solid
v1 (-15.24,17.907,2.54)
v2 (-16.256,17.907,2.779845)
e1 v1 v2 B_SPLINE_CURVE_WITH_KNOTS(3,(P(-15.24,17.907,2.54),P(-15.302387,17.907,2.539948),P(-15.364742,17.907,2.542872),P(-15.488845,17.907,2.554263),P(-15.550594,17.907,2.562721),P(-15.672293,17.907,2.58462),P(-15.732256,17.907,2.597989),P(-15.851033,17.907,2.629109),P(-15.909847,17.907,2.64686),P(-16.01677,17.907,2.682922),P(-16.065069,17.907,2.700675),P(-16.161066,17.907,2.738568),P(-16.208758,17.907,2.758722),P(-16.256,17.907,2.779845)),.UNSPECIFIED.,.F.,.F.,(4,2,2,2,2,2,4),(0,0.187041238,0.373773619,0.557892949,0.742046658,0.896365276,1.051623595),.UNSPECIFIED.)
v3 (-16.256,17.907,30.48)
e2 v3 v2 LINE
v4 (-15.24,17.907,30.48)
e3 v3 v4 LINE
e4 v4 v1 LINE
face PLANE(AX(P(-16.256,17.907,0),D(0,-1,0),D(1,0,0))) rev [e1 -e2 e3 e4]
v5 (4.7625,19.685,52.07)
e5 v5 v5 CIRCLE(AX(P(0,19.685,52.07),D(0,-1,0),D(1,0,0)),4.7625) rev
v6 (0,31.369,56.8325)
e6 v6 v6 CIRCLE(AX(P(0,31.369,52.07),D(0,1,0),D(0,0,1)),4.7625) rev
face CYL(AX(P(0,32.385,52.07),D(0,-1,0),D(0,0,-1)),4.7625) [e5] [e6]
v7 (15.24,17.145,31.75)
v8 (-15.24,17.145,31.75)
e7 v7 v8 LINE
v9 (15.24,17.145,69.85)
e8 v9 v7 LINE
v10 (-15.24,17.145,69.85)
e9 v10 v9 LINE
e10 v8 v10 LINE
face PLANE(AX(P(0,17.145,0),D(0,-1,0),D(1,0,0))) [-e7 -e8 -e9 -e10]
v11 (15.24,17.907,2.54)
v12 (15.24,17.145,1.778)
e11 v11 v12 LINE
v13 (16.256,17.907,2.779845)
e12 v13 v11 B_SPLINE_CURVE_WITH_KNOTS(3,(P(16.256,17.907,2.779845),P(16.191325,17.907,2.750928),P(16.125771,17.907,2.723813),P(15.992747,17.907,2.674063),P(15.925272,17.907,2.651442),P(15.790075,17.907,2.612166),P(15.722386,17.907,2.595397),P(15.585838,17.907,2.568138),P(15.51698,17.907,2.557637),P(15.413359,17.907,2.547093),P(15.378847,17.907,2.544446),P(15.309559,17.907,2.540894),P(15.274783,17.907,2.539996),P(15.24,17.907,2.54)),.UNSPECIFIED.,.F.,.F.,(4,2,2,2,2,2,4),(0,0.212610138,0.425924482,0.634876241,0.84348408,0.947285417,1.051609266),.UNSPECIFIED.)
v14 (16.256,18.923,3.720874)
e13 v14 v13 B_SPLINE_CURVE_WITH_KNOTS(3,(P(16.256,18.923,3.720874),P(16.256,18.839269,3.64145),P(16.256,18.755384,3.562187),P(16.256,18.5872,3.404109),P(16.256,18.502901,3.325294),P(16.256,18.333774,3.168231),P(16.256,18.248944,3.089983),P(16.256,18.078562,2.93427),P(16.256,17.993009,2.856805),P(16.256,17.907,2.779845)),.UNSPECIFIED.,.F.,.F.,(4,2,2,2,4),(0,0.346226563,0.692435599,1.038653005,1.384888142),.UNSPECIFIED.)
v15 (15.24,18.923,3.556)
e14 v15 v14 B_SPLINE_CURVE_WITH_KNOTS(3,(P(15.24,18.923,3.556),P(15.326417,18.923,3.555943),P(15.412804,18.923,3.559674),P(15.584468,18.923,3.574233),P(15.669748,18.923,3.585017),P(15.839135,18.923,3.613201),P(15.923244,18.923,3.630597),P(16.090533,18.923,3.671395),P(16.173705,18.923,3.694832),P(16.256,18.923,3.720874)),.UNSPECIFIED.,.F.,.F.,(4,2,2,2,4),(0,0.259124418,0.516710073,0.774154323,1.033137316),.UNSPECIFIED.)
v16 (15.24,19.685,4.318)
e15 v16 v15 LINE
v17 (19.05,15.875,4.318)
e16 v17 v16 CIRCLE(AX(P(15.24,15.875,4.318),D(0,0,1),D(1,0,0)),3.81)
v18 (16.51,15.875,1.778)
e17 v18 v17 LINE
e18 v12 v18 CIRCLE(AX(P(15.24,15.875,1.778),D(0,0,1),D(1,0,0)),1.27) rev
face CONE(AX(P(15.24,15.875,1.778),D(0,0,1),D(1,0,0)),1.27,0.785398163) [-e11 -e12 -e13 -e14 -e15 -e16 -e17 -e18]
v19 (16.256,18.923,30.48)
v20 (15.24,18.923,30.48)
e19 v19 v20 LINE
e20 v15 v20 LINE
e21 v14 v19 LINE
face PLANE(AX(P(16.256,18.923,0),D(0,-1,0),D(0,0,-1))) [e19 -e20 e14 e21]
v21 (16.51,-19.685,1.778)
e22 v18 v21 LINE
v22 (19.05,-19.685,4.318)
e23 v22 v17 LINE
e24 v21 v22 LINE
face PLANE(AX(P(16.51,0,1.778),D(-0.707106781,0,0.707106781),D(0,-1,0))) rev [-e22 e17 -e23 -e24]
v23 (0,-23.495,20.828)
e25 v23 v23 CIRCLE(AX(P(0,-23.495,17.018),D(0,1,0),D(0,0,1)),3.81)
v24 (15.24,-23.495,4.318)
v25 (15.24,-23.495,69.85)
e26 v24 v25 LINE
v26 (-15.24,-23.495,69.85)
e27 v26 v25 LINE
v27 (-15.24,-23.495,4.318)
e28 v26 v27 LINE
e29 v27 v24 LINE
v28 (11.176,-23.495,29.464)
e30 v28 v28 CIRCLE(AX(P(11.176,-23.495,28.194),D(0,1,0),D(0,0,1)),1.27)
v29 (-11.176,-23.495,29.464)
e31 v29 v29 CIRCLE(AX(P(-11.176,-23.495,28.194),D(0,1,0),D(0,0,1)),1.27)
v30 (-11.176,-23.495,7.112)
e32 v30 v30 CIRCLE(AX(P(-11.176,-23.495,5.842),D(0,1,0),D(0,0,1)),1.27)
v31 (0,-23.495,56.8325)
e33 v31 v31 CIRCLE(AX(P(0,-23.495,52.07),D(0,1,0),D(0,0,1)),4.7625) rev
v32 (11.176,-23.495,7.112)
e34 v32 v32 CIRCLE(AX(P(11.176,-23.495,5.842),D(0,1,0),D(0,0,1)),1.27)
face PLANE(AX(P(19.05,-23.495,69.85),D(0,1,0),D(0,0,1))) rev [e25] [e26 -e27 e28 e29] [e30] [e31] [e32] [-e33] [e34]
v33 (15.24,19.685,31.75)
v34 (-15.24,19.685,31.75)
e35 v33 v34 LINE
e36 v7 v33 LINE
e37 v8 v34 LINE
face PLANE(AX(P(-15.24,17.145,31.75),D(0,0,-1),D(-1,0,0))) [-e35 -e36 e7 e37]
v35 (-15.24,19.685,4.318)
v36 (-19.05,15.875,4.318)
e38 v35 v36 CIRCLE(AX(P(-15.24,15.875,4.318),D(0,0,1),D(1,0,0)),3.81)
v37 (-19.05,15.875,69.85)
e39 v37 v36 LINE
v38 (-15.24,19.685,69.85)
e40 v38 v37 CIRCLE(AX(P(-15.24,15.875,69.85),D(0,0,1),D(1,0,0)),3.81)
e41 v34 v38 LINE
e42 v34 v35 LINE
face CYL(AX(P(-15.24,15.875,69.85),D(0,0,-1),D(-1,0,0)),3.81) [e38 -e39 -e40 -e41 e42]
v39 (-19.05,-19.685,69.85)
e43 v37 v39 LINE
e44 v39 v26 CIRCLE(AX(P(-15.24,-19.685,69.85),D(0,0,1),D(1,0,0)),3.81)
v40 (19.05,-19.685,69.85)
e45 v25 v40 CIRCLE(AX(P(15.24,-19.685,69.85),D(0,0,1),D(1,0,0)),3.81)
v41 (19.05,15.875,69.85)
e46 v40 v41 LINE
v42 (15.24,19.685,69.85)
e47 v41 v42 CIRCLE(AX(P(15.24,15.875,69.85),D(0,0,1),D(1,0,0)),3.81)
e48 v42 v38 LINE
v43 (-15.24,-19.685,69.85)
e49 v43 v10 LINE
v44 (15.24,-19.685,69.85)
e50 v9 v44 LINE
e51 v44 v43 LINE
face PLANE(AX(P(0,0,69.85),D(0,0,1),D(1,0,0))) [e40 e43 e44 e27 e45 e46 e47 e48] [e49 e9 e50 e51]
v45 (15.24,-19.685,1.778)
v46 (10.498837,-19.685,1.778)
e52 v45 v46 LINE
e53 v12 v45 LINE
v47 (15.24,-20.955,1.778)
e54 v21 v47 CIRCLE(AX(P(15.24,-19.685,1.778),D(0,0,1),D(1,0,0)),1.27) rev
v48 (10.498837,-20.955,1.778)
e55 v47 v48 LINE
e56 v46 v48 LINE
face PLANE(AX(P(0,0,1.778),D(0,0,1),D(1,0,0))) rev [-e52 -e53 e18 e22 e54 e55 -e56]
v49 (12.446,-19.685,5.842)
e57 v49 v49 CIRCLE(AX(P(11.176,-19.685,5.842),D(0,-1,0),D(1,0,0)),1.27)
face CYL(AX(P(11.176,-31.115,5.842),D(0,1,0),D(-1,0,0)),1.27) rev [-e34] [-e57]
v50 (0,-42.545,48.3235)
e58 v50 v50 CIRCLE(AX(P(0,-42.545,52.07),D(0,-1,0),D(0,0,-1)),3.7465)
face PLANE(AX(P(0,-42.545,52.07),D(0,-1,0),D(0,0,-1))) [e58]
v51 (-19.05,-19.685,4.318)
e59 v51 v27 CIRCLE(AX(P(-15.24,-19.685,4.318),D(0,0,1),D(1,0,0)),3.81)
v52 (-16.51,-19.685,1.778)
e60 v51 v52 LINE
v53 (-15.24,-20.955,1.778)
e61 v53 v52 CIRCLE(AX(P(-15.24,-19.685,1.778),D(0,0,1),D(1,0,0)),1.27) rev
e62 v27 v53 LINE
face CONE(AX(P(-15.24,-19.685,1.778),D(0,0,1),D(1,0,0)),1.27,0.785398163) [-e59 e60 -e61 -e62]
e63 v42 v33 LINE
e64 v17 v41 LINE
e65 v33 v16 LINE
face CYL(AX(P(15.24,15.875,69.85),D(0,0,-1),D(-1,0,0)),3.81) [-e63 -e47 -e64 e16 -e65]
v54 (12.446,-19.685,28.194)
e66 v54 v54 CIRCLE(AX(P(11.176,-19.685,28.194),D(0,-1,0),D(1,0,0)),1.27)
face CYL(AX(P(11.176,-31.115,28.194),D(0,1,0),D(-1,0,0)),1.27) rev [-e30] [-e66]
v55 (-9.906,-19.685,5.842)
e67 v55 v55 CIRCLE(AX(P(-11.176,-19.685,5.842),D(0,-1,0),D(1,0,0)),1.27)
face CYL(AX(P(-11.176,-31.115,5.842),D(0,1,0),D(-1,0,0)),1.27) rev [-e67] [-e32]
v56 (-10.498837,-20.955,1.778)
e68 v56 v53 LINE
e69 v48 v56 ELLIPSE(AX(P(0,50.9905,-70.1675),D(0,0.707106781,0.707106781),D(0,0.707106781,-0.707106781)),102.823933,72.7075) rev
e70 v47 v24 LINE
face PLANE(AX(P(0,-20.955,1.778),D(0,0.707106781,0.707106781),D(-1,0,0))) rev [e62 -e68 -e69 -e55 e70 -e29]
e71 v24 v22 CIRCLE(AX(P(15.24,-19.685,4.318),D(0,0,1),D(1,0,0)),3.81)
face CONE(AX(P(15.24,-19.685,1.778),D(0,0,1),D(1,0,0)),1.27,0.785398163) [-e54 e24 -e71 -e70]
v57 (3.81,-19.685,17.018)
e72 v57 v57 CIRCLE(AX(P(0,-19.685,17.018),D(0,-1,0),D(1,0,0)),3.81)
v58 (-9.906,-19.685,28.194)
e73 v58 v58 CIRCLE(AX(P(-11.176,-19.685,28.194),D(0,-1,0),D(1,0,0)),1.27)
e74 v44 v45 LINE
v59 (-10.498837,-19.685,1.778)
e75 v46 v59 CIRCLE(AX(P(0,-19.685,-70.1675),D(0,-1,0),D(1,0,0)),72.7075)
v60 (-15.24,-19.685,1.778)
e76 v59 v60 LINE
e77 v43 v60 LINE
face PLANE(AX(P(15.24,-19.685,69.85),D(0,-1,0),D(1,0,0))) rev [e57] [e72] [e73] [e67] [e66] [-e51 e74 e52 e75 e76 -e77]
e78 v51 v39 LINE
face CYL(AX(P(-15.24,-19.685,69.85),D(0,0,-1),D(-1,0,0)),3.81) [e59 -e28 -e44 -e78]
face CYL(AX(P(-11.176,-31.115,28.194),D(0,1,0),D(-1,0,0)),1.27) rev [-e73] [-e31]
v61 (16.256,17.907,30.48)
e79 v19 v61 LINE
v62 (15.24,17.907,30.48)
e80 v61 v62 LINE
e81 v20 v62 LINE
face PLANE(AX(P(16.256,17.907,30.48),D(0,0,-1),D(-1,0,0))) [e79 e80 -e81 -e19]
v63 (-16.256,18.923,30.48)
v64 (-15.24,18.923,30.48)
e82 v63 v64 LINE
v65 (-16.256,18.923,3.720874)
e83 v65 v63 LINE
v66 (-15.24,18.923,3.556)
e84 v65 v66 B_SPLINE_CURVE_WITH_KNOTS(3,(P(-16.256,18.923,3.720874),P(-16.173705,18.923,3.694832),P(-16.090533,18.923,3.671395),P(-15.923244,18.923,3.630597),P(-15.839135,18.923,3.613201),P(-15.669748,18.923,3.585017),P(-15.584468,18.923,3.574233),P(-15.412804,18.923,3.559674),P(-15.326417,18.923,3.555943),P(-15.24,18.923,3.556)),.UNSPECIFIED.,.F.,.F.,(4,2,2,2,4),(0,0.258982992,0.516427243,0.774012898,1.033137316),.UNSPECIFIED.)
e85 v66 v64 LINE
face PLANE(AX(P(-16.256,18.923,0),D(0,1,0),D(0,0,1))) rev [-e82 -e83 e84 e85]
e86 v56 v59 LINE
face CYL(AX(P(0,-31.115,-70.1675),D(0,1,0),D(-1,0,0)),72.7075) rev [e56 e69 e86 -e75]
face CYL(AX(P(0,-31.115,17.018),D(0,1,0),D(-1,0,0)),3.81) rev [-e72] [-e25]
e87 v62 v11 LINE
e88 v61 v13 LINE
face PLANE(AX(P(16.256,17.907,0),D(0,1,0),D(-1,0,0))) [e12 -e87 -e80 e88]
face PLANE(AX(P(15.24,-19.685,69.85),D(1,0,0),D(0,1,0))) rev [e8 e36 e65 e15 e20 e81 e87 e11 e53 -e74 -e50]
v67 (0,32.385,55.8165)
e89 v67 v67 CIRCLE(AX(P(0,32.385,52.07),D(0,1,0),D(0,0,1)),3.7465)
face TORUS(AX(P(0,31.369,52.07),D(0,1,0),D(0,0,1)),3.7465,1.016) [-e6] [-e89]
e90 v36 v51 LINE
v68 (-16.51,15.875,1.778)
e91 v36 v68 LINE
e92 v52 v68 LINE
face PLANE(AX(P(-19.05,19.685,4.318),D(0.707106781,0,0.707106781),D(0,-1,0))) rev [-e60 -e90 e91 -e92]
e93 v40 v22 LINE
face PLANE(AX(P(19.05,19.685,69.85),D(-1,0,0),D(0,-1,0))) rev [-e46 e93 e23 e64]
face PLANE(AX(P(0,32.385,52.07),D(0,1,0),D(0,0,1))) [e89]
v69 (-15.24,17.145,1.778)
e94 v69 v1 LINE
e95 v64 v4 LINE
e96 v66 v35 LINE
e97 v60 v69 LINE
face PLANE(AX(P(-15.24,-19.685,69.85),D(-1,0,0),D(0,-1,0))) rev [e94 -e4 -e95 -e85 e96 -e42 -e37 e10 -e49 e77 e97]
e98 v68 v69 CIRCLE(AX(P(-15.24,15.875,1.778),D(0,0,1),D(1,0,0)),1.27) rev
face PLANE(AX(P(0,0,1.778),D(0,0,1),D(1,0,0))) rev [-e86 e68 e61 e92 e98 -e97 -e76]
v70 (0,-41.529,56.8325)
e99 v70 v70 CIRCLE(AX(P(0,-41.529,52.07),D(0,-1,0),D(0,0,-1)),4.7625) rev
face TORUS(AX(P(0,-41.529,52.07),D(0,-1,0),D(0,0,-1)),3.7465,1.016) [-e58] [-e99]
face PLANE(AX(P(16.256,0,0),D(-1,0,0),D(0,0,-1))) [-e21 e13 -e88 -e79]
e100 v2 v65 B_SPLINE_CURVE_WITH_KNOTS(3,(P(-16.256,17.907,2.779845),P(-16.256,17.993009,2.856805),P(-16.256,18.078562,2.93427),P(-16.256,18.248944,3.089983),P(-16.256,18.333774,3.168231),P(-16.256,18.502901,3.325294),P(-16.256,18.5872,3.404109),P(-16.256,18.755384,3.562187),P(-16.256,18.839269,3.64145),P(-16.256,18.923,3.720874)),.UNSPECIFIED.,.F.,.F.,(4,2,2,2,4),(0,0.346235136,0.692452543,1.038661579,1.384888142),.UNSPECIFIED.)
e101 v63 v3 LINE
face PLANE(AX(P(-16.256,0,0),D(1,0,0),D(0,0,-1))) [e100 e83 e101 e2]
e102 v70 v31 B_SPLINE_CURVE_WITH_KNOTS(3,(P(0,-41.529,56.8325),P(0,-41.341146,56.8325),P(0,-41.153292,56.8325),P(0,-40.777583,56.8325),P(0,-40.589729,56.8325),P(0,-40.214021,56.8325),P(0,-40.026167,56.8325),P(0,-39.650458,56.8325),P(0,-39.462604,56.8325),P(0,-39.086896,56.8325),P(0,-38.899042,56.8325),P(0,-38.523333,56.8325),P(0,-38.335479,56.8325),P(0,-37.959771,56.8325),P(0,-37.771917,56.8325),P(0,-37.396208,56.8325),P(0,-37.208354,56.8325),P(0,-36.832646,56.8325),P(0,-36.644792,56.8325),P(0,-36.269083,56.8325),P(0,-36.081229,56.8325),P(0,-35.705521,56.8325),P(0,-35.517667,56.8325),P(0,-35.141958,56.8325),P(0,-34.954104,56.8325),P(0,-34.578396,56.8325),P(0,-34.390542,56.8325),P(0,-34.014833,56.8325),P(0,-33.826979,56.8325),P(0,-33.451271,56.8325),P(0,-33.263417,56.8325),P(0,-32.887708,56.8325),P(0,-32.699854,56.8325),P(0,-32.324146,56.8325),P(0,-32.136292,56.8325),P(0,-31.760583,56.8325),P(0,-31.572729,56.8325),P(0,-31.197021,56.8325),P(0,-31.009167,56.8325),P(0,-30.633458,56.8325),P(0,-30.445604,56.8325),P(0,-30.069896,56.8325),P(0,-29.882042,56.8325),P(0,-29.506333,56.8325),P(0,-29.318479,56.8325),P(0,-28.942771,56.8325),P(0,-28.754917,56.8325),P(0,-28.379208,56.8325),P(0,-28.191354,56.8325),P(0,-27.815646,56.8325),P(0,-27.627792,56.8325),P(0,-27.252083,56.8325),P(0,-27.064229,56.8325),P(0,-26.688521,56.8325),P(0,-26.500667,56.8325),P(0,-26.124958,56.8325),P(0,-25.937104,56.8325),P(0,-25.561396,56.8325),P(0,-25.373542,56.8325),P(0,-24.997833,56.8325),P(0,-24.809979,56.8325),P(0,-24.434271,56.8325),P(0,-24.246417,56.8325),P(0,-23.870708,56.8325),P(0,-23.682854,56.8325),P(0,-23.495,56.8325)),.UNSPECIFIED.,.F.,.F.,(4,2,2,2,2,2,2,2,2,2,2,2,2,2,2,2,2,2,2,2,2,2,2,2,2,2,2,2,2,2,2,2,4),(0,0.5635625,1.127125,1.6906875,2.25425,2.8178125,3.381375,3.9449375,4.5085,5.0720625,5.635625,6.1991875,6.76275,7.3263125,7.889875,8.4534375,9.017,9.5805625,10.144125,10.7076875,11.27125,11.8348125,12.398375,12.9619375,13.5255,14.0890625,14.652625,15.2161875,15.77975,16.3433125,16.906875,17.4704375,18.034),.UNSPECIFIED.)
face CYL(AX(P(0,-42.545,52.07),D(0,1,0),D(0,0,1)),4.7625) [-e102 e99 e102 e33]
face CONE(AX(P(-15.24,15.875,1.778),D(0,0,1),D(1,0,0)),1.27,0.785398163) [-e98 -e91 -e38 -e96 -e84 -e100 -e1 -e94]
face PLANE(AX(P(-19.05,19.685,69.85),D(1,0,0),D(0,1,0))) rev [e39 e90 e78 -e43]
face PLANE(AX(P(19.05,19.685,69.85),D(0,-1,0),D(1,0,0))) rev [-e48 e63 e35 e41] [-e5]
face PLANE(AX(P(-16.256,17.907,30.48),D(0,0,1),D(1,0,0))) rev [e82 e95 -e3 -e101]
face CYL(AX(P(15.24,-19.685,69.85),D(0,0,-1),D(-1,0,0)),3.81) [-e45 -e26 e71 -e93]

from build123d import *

# Parameters (mm, degrees)
BOSS_EXTRUDE1_DEPTH = 69.85
CUT_EXTRUDE1_DEPTH  = 50.8
SKETCH3_R           = 1.27
SKETCH3_R_2         = 3.81
CUT_EXTRUDE2_DEPTH  = 50.8
SKETCH4_W           = 30.48
SKETCH4_H           = 38.1
BOSS_EXTRUDE2_DEPTH = 2.54
SKETCH5_W           = 30.48
SKETCH5_H           = 1.016
CUT_EXTRUDE3_DEPTH  = 1.016
FILLET1_R           = 3.81
SKETCH6_R           = 4.7625
BOSS_EXTRUDE3_DEPTH = 12.7
BOSS_EXTRUDE4_START = 19.05
SKETCH8_R           = 4.7625
BOSS_EXTRUDE4_DEPTH = 19.05
FILLET2_R           = 1.016
SKETCH9_W           = 38.1
SKETCH9_H           = 43.18
CUT_EXTRUDE4_DEPTH  = 2.032


# Some blends are built 0.0001 mm under size
with BuildPart() as part:
    # Sketch1 → Boss-Extrude1 (new body)
    with BuildSketch(Plane.XY):
        Polygon((15.24, -19.685), (-15.24, -19.685), (-15.24, 19.685), (-19.05, 19.685), (-19.05, -23.495), (15.24, -23.495), (19.05, -23.495), (19.05, 19.685), (15.24, 19.685), align=None)
    extrude(amount=BOSS_EXTRUDE1_DEPTH)

    # Sketch2 → Cut-Extrude1 (cut)
    with BuildSketch(Plane(origin=(0, 19.685, 0), x_dir=(1, 0, 0), z_dir=(0, 1, 0))):
        with BuildLine():
            Line((-19.05, 0), (19.05, 0))
            ThreePointArc((19.05, 0), (0, -2.54), (-19.05, 0))
        make_face()
    extrude(amount=-CUT_EXTRUDE1_DEPTH, mode=Mode.SUBTRACT)

    # Sketch3 → Cut-Extrude2 (cut)
    with BuildSketch(Plane(origin=(0, 19.685, 0), x_dir=(1, 0, 0), z_dir=(0, 1, 0))):
        with Locations(Location((-11.176, -5.842, 0), (0, 0, 270))):
            Circle(SKETCH3_R)
        with Locations(Location((11.176, -5.842, 0), (0, 0, 270))):
            Circle(SKETCH3_R)
        with Locations(Location((11.176, -28.194, 0), (0, 0, 270))):
            Circle(SKETCH3_R)
        with Locations(Location((-11.176, -28.194, 0), (0, 0, 270))):
            Circle(SKETCH3_R)
        with Locations(Location((0, -17.018, 0), (0, 0, 270))):
            Circle(SKETCH3_R_2)
    extrude(amount=-CUT_EXTRUDE2_DEPTH, mode=Mode.SUBTRACT)

    # Sketch4 → Boss-Extrude2 (add)
    with BuildSketch(Plane(origin=(0, 19.685, 0), x_dir=(1, 0, 0), z_dir=(0, 1, 0))):
        with Locations((0, -50.8)):
            Rectangle(SKETCH4_W, SKETCH4_H)
    extrude(amount=-BOSS_EXTRUDE2_DEPTH)

    # Sketch5 → Cut-Extrude3 (cut)
    with BuildSketch(Plane(origin=(-15.24, 0, 0), x_dir=(0, 0, -1), z_dir=(1, 0, 0))):
        with Locations((-15.24, 18.415)):
            Rectangle(SKETCH5_W, SKETCH5_H)
    cut_extrude3 = extrude(amount=-CUT_EXTRUDE3_DEPTH, mode=Mode.SUBTRACT)

    # Mirror1: Cut-Extrude3 across plane
    add(cut_extrude3.mirror(Plane(origin=(0, 0, 0), x_dir=(0, 0, 1), z_dir=(1, 0, 0))), mode=Mode.SUBTRACT)

    # Fillet1
    fillet1_edges = [part.edges().sort_by_distance(p)[0] for p in [
        (19.05, 19.685, 34.925),
        (19.05, -23.495, 34.925),
        (-19.05, -23.495, 34.925),
        (-19.05, 19.685, 34.925),
    ]]
    fillet(fillet1_edges, radius=FILLET1_R - 0.0001)  # a hair under: the kernel refuses the full size

    # Sketch6 → Boss-Extrude3 (add)
    with BuildSketch(Plane(origin=(0, 19.685, 0), x_dir=(1, 0, 0), z_dir=(0, 1, 0))):
        with Locations((0, -52.07)):
            Circle(SKETCH6_R)
    extrude(amount=BOSS_EXTRUDE3_DEPTH)

    # Sketch8 → Boss-Extrude4 (add)
    with BuildSketch(Plane.XZ.offset(23.495).offset(BOSS_EXTRUDE4_START)):
        with Locations((0, 52.07)):
            Circle(SKETCH8_R)
    extrude(amount=-BOSS_EXTRUDE4_DEPTH)

    # Fillet2
    fillet2_edges = [part.edges().sort_by_distance(p)[0] for p in [
        (-4.7625, 32.385, 52.07),
        (-4.7625, -42.545, 52.07),
    ]]
    fillet(fillet2_edges, radius=FILLET2_R)

    # Sketch9 → Cut-Extrude4 (cut)
    with BuildSketch(Plane(origin=(0, 0, 1.778), x_dir=(-1, 0, 0), z_dir=(0, 0, -1))):
        with Locations((0, -1.905)):
            Rectangle(SKETCH9_W, SKETCH9_H)
    extrude(amount=CUT_EXTRUDE4_DEPTH, mode=Mode.SUBTRACT)

    # Chamfer1
    # the kernel refuses this chamfer: 2.54 mm, written as the material it takes off along each edge
    with BuildSketch(Plane(origin=(-15.2401, 15.8751, 1.778), x_dir=(0, 1, 0), z_dir=(1, 0, 0))) as chamfer1_piece_1:
        with BuildLine():
            Line((1.198057951, -0.071842049), (3.881742049, 2.611842049))
            Line((3.881742049, 2.611842049), (3.932542049, 2.611842049))
            ThreePointArc((3.932542049, 2.611842049), (3.8607, 1.305921024), (3.8607, 0))
            Line((3.8607, 0), (3.8099, -0.0508))
            ThreePointArc((3.8099, -0.0508), (2.503978976, -0.0508), (1.198057951, -0.122642049))
            Line((1.198057951, -0.122642049), (1.198057951, -0.071842049))
        make_face()
    revolve(axis=Axis((-15.2401, 15.8751, 1.778), (0, 0, 1)), revolution_arc=90, mode=Mode.SUBTRACT)
    with BuildSketch(Plane(origin=(-15.2401, -19.6851, 1.778), x_dir=(-1, 0, 0), z_dir=(0, 1, 0))) as chamfer1_piece_2:
        with BuildLine():
            Line((3.881742049, 2.611842049), (1.198057951, -0.071842049))
            Line((1.198057951, -0.071842049), (1.198057951, -0.122642049))
            ThreePointArc((1.198057951, -0.122642049), (2.503978976, -0.0508), (3.8099, -0.0508))
            Line((3.8099, -0.0508), (3.8607, 0))
            ThreePointArc((3.8607, 0), (3.8607, 1.305921024), (3.932542049, 2.611842049))
            Line((3.932542049, 2.611842049), (3.881742049, 2.611842049))
        make_face()
    revolve(axis=Axis((-15.2401, -19.6851, 1.778), (0, 0, 1)), revolution_arc=90, mode=Mode.SUBTRACT)
    with BuildSketch(Plane(origin=(-19.05, 15.8751, 1.778), x_dir=(1, 0, 0), z_dir=(0, -1, 0)), Plane(origin=(19.05, -19.6851, 1.778), x_dir=(-1, 0, 0), z_dir=(0, 1, 0))) as chamfer1_piece_3:
        with BuildLine():
            Line((2.611842049, -0.071842049), (-0.071842049, 2.611842049))
            Line((-0.071842049, 2.611842049), (-0.122642049, 2.611842049))
            ThreePointArc((-0.122642049, 2.611842049), (-0.0508, 1.305921024), (-0.0508, 0))
            Line((-0.0508, 0), (0, -0.0508))
            ThreePointArc((0, -0.0508), (1.305921024, -0.0508), (2.611842049, -0.122642049))
            Line((2.611842049, -0.122642049), (2.611842049, -0.071842049))
        make_face()
    extrude(amount=35.5602, mode=Mode.SUBTRACT)
    with BuildSketch(Plane(origin=(-5.17814213, -23.495, 1.778), x_dir=(0, 0, 1), z_dir=(1, 0, 0)), Plane(origin=(-15.2401, -23.495, 1.778), x_dir=(0, 0, 1), z_dir=(1, 0, 0))) as chamfer1_piece_4:
        with BuildLine():
            Line((2.611842049, 0.071842049), (-0.071842049, -2.611842049))
            Line((-0.071842049, -2.611842049), (-0.122642049, -2.611842049))
            ThreePointArc((-0.122642049, -2.611842049), (-0.0508, -1.305921024), (-0.0508, 0))
            Line((-0.0508, 0), (0, 0.0508))
            ThreePointArc((0, 0.0508), (1.305921024, 0.0508), (2.611842049, 0.122642049))
            Line((2.611842049, 0.122642049), (2.611842049, 0.071842049))
        make_face()
    extrude(amount=20.41824213, mode=Mode.SUBTRACT)
    with BuildSketch(Plane(origin=(15.2401, 15.8751, 1.778), x_dir=(1, 0, 0), z_dir=(0, -1, 0))) as chamfer1_piece_5:
        with BuildLine():
            Line((1.198057951, -0.071842049), (3.881742049, 2.611842049))
            Line((3.881742049, 2.611842049), (3.932542049, 2.611842049))
            ThreePointArc((3.932542049, 2.611842049), (3.8607, 1.305921024), (3.8607, 0))
            Line((3.8607, 0), (3.8099, -0.0508))
            ThreePointArc((3.8099, -0.0508), (2.503978976, -0.0508), (1.198057951, -0.122642049))
            Line((1.198057951, -0.122642049), (1.198057951, -0.071842049))
        make_face()
    revolve(axis=Axis((15.2401, 15.8751, 1.778), (0, 0, 1)), revolution_arc=90, mode=Mode.SUBTRACT)
    with BuildSketch(Plane(origin=(15.2401, -19.6851, 1.778), x_dir=(0, -1, 0), z_dir=(-1, 0, 0))) as chamfer1_piece_6:
        with BuildLine():
            Line((1.198057951, -0.071842049), (3.881742049, 2.611842049))
            Line((3.881742049, 2.611842049), (3.932542049, 2.611842049))
            ThreePointArc((3.932542049, 2.611842049), (3.8607, 1.305921024), (3.8607, 0))
            Line((3.8607, 0), (3.8099, -0.0508))
            ThreePointArc((3.8099, -0.0508), (2.503978976, -0.0508), (1.198057951, -0.122642049))
            Line((1.198057951, -0.122642049), (1.198057951, -0.071842049))
        make_face()
    revolve(axis=Axis((15.2401, -19.6851, 1.778), (0, 0, 1)), revolution_arc=90, mode=Mode.SUBTRACT)
    with BuildSketch(Plane(origin=(15.2401, 19.685, 1.778), x_dir=(0, -1, 0), z_dir=(-1, 0, 0)), Plane(origin=(0.436979495, 19.685, 1.778), x_dir=(0, -1, 0), z_dir=(-1, 0, 0))) as chamfer1_piece_7:
        with BuildLine():
            Line((2.611842049, -0.071842049), (-0.071842049, 2.611842049))
            Line((-0.071842049, 2.611842049), (-0.122642049, 2.611842049))
            ThreePointArc((-0.122642049, 2.611842049), (-0.0508, 1.305921024), (-0.0508, 0))
            Line((-0.0508, 0), (0, -0.0508))
            ThreePointArc((0, -0.0508), (1.305921024, -0.0508), (2.611842049, -0.122642049))
            Line((2.611842049, -0.122642049), (2.611842049, -0.071842049))
        make_face()
    extrude(amount=15.677079495, mode=Mode.SUBTRACT)


solid = part.part
